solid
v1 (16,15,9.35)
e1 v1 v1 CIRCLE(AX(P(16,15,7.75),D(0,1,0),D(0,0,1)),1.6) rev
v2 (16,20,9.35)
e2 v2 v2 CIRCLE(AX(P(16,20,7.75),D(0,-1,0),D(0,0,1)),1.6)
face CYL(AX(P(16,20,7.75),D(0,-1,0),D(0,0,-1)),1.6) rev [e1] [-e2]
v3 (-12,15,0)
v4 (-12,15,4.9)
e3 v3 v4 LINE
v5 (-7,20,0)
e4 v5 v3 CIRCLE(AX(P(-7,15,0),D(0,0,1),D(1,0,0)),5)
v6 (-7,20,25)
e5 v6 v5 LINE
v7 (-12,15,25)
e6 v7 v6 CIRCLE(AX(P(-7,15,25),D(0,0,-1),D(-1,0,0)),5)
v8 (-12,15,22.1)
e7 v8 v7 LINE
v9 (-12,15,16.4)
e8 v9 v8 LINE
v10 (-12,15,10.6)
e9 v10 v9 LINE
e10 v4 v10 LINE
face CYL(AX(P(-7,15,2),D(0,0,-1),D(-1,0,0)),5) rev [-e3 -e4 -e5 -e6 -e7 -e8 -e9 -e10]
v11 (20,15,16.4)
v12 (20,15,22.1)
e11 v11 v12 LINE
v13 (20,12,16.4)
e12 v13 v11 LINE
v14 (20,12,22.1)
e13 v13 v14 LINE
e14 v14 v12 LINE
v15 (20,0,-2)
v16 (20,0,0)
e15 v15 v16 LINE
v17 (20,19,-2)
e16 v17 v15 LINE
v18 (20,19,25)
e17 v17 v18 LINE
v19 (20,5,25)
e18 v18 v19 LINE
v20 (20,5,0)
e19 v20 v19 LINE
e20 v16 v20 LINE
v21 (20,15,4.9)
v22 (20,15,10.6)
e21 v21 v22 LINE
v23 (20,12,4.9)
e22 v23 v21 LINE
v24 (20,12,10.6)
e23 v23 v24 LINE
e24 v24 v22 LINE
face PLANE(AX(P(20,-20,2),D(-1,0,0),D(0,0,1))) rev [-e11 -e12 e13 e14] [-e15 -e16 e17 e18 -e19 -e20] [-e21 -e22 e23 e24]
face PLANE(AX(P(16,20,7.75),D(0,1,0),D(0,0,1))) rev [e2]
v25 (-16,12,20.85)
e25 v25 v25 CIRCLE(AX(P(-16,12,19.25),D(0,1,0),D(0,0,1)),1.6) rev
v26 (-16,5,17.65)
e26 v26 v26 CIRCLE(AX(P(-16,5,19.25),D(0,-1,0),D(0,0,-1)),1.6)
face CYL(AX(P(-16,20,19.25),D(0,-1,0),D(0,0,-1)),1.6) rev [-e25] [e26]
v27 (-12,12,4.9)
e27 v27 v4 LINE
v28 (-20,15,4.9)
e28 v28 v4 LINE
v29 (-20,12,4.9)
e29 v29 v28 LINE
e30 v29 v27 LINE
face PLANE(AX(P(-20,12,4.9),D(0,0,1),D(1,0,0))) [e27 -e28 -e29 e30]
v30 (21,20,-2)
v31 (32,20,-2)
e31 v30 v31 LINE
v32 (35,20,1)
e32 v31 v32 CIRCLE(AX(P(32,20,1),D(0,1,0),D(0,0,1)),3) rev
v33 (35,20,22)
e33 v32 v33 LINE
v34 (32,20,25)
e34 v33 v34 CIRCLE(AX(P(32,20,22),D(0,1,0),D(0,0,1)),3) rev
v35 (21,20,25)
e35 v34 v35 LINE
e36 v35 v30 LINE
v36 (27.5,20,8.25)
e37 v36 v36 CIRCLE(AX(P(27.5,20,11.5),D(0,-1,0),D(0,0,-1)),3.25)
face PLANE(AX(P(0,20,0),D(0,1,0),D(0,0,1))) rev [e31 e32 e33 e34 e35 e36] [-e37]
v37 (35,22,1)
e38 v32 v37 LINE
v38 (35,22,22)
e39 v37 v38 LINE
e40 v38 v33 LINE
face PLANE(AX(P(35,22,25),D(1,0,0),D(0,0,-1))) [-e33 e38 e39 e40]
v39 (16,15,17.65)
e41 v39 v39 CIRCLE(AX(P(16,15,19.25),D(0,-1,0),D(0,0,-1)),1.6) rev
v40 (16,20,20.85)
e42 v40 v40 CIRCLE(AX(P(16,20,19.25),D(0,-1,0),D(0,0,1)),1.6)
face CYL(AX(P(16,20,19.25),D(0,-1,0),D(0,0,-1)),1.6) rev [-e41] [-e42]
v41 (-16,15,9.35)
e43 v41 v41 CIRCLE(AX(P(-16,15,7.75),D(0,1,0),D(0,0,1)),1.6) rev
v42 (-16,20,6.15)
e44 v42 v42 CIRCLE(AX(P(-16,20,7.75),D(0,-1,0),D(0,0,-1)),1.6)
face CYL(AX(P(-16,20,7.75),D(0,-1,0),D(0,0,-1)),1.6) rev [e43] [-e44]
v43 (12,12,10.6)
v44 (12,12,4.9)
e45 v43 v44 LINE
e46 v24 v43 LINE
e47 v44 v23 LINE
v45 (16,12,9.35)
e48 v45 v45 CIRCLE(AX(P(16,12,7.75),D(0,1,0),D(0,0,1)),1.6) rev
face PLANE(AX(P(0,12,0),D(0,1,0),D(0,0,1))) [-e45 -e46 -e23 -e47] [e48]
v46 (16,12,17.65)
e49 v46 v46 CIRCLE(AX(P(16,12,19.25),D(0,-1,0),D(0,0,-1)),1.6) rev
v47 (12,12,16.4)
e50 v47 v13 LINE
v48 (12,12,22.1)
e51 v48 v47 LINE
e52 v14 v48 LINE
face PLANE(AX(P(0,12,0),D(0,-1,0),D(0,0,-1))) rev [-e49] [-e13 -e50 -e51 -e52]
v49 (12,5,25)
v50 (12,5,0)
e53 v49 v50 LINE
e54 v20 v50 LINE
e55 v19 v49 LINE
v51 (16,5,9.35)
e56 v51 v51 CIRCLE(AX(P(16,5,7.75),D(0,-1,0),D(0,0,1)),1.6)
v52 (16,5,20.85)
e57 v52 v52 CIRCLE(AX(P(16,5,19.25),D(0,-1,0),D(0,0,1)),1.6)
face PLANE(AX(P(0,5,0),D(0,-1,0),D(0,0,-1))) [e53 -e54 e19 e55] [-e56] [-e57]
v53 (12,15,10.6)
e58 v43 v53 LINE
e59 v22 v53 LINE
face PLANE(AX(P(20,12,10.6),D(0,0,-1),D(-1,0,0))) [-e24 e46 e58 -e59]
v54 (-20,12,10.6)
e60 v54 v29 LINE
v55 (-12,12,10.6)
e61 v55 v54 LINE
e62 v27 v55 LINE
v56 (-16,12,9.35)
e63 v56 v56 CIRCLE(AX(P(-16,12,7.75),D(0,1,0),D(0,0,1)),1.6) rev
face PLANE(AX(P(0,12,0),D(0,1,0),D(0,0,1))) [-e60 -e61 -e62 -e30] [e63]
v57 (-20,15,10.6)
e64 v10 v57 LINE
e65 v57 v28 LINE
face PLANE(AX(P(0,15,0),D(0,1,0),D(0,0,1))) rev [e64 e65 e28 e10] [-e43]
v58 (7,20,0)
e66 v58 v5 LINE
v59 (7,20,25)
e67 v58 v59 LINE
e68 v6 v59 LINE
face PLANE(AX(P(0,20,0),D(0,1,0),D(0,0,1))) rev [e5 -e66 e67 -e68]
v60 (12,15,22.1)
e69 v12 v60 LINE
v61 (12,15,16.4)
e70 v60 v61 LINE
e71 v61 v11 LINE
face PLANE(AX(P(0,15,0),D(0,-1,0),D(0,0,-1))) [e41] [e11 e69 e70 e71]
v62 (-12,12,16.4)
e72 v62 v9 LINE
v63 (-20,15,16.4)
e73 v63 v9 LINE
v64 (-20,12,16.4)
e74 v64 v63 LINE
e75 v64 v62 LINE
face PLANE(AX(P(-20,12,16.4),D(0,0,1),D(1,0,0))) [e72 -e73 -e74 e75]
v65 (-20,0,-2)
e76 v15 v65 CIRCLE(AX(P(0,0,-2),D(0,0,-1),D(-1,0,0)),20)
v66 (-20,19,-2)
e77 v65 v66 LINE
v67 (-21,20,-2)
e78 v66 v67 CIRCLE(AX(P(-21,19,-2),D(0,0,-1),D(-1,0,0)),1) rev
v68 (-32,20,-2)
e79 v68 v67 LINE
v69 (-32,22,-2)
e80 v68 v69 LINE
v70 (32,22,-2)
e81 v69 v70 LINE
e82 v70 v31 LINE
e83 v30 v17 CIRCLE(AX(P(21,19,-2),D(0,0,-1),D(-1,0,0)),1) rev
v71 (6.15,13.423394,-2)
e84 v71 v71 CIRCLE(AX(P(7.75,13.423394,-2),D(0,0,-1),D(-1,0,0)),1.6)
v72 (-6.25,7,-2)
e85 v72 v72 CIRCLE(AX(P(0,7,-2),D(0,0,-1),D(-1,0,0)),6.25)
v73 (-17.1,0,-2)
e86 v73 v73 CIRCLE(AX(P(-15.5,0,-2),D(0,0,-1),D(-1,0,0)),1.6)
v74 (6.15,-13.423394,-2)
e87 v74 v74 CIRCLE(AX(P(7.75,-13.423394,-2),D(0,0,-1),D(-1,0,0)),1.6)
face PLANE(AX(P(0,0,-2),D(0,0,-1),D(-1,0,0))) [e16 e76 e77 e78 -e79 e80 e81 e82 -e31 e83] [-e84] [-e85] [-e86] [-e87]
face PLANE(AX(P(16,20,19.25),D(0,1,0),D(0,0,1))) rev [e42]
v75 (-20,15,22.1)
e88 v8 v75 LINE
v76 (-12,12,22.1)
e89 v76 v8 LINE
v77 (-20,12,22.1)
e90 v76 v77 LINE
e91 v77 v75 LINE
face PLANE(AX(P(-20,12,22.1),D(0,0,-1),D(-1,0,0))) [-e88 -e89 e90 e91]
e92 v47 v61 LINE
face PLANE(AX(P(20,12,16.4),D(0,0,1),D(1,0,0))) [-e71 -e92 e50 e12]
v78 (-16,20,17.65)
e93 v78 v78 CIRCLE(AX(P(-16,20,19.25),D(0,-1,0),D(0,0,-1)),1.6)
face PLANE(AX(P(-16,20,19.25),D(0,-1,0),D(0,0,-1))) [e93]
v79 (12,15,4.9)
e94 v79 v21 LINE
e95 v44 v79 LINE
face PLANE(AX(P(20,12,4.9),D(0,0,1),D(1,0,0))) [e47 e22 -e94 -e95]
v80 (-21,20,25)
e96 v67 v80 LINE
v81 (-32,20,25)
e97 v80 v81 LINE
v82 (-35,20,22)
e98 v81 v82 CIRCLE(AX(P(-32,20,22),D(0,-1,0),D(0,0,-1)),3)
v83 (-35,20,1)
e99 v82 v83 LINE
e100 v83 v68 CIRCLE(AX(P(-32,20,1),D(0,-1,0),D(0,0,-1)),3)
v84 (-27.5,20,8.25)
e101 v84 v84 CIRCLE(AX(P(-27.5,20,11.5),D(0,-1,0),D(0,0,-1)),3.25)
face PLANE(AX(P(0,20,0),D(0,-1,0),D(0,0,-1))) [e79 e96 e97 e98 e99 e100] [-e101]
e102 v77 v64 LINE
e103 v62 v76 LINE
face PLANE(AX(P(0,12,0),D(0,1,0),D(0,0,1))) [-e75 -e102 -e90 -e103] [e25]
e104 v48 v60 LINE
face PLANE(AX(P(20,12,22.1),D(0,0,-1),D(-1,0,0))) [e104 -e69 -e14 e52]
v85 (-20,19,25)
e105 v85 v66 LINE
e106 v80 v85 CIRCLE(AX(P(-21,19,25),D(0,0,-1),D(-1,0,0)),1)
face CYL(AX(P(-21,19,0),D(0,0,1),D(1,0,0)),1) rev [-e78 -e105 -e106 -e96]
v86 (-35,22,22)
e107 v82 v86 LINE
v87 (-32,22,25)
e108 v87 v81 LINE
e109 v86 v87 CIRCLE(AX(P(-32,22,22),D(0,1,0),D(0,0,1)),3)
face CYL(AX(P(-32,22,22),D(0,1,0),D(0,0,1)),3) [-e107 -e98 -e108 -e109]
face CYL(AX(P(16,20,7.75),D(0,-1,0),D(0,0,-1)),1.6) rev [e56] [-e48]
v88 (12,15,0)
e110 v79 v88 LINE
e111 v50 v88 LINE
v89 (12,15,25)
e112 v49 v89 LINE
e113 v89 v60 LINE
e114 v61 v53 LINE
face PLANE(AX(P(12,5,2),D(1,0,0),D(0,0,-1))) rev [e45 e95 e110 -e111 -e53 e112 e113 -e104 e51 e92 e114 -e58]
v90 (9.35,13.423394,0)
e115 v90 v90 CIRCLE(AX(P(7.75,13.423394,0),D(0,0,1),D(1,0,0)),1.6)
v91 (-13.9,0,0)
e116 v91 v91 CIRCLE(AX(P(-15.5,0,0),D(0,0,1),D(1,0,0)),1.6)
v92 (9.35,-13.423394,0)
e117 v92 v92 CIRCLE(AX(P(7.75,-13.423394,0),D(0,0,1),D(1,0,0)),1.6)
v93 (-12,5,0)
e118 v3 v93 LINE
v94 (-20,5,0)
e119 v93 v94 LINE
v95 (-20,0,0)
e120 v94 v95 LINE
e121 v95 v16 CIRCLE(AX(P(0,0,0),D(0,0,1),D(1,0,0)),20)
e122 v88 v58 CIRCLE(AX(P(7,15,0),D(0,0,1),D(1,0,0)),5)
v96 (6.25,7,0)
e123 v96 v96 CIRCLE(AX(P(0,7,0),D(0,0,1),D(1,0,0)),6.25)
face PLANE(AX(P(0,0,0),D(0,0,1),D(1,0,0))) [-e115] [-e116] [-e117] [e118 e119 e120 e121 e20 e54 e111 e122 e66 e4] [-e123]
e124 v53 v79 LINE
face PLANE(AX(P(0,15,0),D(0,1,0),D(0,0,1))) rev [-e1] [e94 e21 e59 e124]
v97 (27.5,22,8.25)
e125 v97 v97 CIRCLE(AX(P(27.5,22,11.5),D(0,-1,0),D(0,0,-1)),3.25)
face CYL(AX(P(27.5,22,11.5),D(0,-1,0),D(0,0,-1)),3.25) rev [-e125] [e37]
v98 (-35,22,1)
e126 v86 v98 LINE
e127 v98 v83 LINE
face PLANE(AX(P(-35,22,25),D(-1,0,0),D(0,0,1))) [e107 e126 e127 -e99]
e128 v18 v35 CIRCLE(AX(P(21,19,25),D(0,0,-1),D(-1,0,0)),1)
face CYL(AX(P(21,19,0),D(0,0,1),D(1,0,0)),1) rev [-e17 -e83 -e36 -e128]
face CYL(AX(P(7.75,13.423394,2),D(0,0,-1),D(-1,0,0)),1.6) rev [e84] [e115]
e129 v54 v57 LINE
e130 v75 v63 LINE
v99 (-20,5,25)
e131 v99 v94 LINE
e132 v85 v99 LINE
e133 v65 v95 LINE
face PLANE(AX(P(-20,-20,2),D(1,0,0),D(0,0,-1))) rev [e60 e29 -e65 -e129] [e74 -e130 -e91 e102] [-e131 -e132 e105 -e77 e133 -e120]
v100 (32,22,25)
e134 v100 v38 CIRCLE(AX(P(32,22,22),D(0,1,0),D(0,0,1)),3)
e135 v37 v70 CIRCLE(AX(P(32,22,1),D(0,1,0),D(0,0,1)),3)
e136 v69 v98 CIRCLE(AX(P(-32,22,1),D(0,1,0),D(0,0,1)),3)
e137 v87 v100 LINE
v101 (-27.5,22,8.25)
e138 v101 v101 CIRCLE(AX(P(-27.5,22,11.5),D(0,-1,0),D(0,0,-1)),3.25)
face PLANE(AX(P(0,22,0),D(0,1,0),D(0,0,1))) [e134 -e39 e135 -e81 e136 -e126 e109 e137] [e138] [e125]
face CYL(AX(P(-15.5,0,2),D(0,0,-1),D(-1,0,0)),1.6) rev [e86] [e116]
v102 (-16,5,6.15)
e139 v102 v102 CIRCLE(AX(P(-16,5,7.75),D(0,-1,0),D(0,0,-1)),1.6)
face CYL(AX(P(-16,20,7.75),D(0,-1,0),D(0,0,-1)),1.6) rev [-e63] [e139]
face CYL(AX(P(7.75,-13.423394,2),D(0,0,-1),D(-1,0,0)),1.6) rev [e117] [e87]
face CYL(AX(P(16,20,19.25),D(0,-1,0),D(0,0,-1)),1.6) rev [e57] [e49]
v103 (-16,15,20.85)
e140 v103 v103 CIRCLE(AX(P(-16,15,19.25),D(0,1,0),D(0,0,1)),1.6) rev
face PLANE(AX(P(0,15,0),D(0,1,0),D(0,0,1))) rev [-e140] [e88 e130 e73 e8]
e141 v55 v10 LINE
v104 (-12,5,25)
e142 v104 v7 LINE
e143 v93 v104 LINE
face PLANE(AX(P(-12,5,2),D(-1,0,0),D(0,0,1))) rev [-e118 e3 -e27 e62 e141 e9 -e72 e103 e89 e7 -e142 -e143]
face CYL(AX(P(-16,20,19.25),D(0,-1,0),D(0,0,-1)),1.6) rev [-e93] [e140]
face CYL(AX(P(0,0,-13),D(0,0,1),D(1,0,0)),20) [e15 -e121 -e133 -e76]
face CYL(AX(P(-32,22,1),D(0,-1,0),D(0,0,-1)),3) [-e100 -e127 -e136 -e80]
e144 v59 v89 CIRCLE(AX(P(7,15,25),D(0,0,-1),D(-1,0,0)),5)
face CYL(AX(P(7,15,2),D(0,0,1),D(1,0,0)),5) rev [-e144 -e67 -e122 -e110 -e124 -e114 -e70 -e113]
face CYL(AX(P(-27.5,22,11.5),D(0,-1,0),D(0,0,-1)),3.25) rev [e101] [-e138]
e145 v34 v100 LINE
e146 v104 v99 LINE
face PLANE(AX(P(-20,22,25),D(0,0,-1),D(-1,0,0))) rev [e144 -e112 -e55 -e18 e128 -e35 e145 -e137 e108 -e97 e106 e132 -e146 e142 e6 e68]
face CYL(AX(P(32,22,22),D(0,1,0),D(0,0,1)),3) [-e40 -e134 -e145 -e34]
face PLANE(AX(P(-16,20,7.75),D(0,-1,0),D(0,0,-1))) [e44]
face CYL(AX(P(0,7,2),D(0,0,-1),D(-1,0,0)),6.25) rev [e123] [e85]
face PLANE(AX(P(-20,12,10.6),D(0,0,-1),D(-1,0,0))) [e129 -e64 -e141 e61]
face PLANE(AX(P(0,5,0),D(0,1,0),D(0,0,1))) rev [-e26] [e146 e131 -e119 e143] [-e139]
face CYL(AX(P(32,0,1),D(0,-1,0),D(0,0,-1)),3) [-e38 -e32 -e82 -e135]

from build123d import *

# Parameters (mm, degrees)
SKETCH1_W           = 40
SKETCH1_H           = 40
SKETCH1_R           = 1.6
SKETCH1_R_2         = 6.25
BOSS_EXTRUDE1_DEPTH = 2
SKETCH2_W           = 40
SKETCH2_H           = 25
BOSS_EXTRUDE2_DEPTH = 2
SKETCH3_W           = 8
SKETCH3_H           = 23
BOSS_EXTRUDE3_DEPTH = 15
CUT_EXTRUDE1_DEPTH  = 15
SKETCH5_R           = 1.6
CUT_EXTRUDE2_DEPTH  = 15
BOSS_EXTRUDE4_START = 2
SKETCH8_R           = 1.6
SKETCH8_R_2         = 6.25
BOSS_EXTRUDE4_DEPTH = 2
CUT_EXTRUDE6_START  = -2
SKETCH9_R           = 6.25
SKETCH9_R_2         = 1.6
CUT_EXTRUDE6_DEPTH  = 2
CUT_EXTRUDE5_START  = -10
SKETCH7_W           = 8
SKETCH7_H           = 5.7
CUT_EXTRUDE5_DEPTH  = 3
SKETCH10_W          = 15
SKETCH10_H          = 27
SKETCH10_R          = 3.25
BOSS_EXTRUDE5_DEPTH = 2
FILLET2_START       = -1
FILLET2_DEPTH       = 26
FILLET3_R           = 1
FILLET4_R           = 3


with BuildPart() as part:
    # Sketch1 → Boss-Extrude1 (new body)
    with BuildSketch(Plane.XY):
        Rectangle(SKETCH1_W, SKETCH1_H)
        with Locations((-15.5, 0)):
            Circle(SKETCH1_R, mode=Mode.SUBTRACT)
        with Locations((7.75, 13.423393759)):
            Circle(SKETCH1_R, mode=Mode.SUBTRACT)
        with Locations((7.75, -13.423393759)):
            Circle(SKETCH1_R, mode=Mode.SUBTRACT)
        with Locations((0, 7)):
            Circle(SKETCH1_R_2, mode=Mode.SUBTRACT)
    extrude(amount=BOSS_EXTRUDE1_DEPTH)

    # Sketch2 → Boss-Extrude2 (add)
    with BuildSketch(Plane(origin=(0, 20, 0), x_dir=(1, 0, 0), z_dir=(0, 1, 0))):
        with Locations((0, -12.5)):
            Rectangle(SKETCH2_W, SKETCH2_H)
    extrude(amount=BOSS_EXTRUDE2_DEPTH)

    # Sketch3 → Boss-Extrude3 (add)
    with BuildSketch(Plane.XZ.offset(-20)):
        with Locations((-16, 13.5)):
            Rectangle(SKETCH3_W, SKETCH3_H)
        with Locations((16, 13.5)):
            Rectangle(SKETCH3_W, SKETCH3_H)
    extrude(amount=BOSS_EXTRUDE3_DEPTH)

    # Sketch4 → Cut-Extrude1 (cut)
    with BuildSketch(Plane.XY.offset(2)):
        with BuildLine():
            ThreePointArc((3.6e-08, -20), (-14.142135611, -14.142135636), (-20, 0))
            Line((-20, 0), (-20, -20))
            Line((-20, -20), (3.6e-08, -20))
        make_face()
        with BuildLine():
            ThreePointArc((20, 0), (14.142135636, -14.142135611), (3.6e-08, -20))
            Line((3.6e-08, -20), (20, -20))
            Line((20, -20), (20, 0))
        make_face()
    extrude(amount=-CUT_EXTRUDE1_DEPTH, mode=Mode.SUBTRACT)

    # Sketch5 → Cut-Extrude2 (cut)
    with BuildSketch(Plane.XZ.offset(-5)):
        with Locations(Location((-16, 7.75, 0), (0, 0, 270))):
            Circle(SKETCH5_R)
        with Locations(Location((-16, 19.25, 0), (0, 0, 270))):
            Circle(SKETCH5_R)
        with Locations(Location((16, 7.75, 0), (0, 0, 90))):
            Circle(SKETCH5_R)
        with Locations(Location((16, 19.25, 0), (0, 0, 90))):
            Circle(SKETCH5_R)
    extrude(amount=-CUT_EXTRUDE2_DEPTH, mode=Mode.SUBTRACT)

    # Sketch8 → Boss-Extrude4 (add)
    with BuildSketch(Plane(origin=(0, 0, 0), x_dir=(-1, 0, 0), z_dir=(0, 0, -1)).offset(BOSS_EXTRUDE4_START)):
        with BuildLine():
            Line((-20, 22), (-20, 0))
            ThreePointArc((-20, 0), (0, -20), (20, 0))
            Line((20, 0), (20, 22))
            Line((20, 22), (-20, 22))
        make_face()
        with Locations((-7.75, 13.423393759)):
            Circle(SKETCH8_R, mode=Mode.SUBTRACT)
        with Locations((0, 7)):
            Circle(SKETCH8_R_2, mode=Mode.SUBTRACT)
        with Locations((15.5, 0)):
            Circle(SKETCH8_R, mode=Mode.SUBTRACT)
        with Locations((-7.75, -13.423393759)):
            Circle(SKETCH8_R, mode=Mode.SUBTRACT)
    extrude(amount=-BOSS_EXTRUDE4_DEPTH)

    # Sketch9 → Cut-Extrude6 (cut)
    with BuildSketch(Plane.XY.offset(2).offset(CUT_EXTRUDE6_START)):
        with BuildLine():
            Line((20, 0), (20, 5))
            Line((20, 5), (12, 5))
            Line((12, 5), (12, 20))
            Line((12, 20), (-12, 20))
            Line((-12, 20), (-12, 5))
            Line((-12, 5), (-20, 5))
            Line((-20, 5), (-20, 0))
            ThreePointArc((-20, 0), (0, -20), (20, 0))
        make_face()
        with Locations(Location((0, 7, 0), (0, 0, 180))):
            Circle(SKETCH9_R, mode=Mode.SUBTRACT)
        with Locations(Location((7.75, 13.423393759, 0), (0, 0, 180))):
            Circle(SKETCH9_R_2, mode=Mode.SUBTRACT)
        with Locations(Location((-15.5, 0, 0), (0, 0, 180))):
            Circle(SKETCH9_R_2, mode=Mode.SUBTRACT)
        with Locations(Location((7.75, -13.423393759, 0), (0, 0, 180))):
            Circle(SKETCH9_R_2, mode=Mode.SUBTRACT)
    extrude(amount=CUT_EXTRUDE6_DEPTH, mode=Mode.SUBTRACT)

    # Sketch7 → Cut-Extrude5 (cut)
    with BuildSketch(Plane.XZ.offset(-5).offset(CUT_EXTRUDE5_START)):
        with Locations((-16, 19.25)):
            Rectangle(SKETCH7_W, SKETCH7_H)
        with Locations((16, 19.25)):
            Rectangle(SKETCH7_W, SKETCH7_H)
        with Locations((16, 7.75)):
            Rectangle(SKETCH7_W, SKETCH7_H)
        with Locations((-16, 7.75)):
            Rectangle(SKETCH7_W, SKETCH7_H)
    extrude(amount=CUT_EXTRUDE5_DEPTH, mode=Mode.SUBTRACT)

    # Sketch10 → Boss-Extrude5 (add)
    # profile 1 of 2: a face of its own
    with BuildSketch(Plane.XZ.offset(-20)):
        with Locations((-27.5, 11.5)):
            Rectangle(SKETCH10_W, SKETCH10_H)
        with Locations(Location((-27.5, 11.5, 0), (0, 0, 270))):
            Circle(SKETCH10_R, mode=Mode.SUBTRACT)
    # profile 2 of 2: a face of its own
    with BuildSketch(Plane.XZ.offset(-20)):
        with Locations((27.5, 11.5)):
            Rectangle(SKETCH10_W, SKETCH10_H)
        with Locations(Location((27.5, 11.5, 0), (0, 0, 270))):
            Circle(SKETCH10_R, mode=Mode.SUBTRACT)
    extrude(amount=-BOSS_EXTRUDE5_DEPTH)

    # Fillet2: read off the stored shape, not the designer's step
    # Fillet2 outline → Fillet2 (add)
    with BuildSketch(Plane.XY.offset(FILLET2_START)):
        with BuildLine():
            ThreePointArc((-12, 15), (-10.535533906, 18.535533906), (-7, 20))
            Line((-7, 20), (-12, 20))
            Line((-12, 20), (-12, 15))
        make_face()
        with BuildLine():
            ThreePointArc((7, 20), (10.535533906, 18.535533906), (12, 15))
            Line((12, 15), (12, 20))
            Line((12, 20), (7, 20))
        make_face()
    extrude(amount=FILLET2_DEPTH)

    # Fillet3
    fillet3_edges = [part.edges().sort_by_distance(p)[0] for p in [
        (-20, 20, 11.5),
        (20, 20, 11.5),
    ]]
    fillet(fillet3_edges, radius=FILLET3_R)

    # Fillet4
    fillet4_edges = [part.edges().sort_by_distance(p)[0] for p in [
        (-35, 21, -2),
        (-35, 21, 25),
        (35, 21, 25),
        (35, 21, -2),
    ]]
    fillet(fillet4_edges, radius=FILLET4_R)


solid = part.part
